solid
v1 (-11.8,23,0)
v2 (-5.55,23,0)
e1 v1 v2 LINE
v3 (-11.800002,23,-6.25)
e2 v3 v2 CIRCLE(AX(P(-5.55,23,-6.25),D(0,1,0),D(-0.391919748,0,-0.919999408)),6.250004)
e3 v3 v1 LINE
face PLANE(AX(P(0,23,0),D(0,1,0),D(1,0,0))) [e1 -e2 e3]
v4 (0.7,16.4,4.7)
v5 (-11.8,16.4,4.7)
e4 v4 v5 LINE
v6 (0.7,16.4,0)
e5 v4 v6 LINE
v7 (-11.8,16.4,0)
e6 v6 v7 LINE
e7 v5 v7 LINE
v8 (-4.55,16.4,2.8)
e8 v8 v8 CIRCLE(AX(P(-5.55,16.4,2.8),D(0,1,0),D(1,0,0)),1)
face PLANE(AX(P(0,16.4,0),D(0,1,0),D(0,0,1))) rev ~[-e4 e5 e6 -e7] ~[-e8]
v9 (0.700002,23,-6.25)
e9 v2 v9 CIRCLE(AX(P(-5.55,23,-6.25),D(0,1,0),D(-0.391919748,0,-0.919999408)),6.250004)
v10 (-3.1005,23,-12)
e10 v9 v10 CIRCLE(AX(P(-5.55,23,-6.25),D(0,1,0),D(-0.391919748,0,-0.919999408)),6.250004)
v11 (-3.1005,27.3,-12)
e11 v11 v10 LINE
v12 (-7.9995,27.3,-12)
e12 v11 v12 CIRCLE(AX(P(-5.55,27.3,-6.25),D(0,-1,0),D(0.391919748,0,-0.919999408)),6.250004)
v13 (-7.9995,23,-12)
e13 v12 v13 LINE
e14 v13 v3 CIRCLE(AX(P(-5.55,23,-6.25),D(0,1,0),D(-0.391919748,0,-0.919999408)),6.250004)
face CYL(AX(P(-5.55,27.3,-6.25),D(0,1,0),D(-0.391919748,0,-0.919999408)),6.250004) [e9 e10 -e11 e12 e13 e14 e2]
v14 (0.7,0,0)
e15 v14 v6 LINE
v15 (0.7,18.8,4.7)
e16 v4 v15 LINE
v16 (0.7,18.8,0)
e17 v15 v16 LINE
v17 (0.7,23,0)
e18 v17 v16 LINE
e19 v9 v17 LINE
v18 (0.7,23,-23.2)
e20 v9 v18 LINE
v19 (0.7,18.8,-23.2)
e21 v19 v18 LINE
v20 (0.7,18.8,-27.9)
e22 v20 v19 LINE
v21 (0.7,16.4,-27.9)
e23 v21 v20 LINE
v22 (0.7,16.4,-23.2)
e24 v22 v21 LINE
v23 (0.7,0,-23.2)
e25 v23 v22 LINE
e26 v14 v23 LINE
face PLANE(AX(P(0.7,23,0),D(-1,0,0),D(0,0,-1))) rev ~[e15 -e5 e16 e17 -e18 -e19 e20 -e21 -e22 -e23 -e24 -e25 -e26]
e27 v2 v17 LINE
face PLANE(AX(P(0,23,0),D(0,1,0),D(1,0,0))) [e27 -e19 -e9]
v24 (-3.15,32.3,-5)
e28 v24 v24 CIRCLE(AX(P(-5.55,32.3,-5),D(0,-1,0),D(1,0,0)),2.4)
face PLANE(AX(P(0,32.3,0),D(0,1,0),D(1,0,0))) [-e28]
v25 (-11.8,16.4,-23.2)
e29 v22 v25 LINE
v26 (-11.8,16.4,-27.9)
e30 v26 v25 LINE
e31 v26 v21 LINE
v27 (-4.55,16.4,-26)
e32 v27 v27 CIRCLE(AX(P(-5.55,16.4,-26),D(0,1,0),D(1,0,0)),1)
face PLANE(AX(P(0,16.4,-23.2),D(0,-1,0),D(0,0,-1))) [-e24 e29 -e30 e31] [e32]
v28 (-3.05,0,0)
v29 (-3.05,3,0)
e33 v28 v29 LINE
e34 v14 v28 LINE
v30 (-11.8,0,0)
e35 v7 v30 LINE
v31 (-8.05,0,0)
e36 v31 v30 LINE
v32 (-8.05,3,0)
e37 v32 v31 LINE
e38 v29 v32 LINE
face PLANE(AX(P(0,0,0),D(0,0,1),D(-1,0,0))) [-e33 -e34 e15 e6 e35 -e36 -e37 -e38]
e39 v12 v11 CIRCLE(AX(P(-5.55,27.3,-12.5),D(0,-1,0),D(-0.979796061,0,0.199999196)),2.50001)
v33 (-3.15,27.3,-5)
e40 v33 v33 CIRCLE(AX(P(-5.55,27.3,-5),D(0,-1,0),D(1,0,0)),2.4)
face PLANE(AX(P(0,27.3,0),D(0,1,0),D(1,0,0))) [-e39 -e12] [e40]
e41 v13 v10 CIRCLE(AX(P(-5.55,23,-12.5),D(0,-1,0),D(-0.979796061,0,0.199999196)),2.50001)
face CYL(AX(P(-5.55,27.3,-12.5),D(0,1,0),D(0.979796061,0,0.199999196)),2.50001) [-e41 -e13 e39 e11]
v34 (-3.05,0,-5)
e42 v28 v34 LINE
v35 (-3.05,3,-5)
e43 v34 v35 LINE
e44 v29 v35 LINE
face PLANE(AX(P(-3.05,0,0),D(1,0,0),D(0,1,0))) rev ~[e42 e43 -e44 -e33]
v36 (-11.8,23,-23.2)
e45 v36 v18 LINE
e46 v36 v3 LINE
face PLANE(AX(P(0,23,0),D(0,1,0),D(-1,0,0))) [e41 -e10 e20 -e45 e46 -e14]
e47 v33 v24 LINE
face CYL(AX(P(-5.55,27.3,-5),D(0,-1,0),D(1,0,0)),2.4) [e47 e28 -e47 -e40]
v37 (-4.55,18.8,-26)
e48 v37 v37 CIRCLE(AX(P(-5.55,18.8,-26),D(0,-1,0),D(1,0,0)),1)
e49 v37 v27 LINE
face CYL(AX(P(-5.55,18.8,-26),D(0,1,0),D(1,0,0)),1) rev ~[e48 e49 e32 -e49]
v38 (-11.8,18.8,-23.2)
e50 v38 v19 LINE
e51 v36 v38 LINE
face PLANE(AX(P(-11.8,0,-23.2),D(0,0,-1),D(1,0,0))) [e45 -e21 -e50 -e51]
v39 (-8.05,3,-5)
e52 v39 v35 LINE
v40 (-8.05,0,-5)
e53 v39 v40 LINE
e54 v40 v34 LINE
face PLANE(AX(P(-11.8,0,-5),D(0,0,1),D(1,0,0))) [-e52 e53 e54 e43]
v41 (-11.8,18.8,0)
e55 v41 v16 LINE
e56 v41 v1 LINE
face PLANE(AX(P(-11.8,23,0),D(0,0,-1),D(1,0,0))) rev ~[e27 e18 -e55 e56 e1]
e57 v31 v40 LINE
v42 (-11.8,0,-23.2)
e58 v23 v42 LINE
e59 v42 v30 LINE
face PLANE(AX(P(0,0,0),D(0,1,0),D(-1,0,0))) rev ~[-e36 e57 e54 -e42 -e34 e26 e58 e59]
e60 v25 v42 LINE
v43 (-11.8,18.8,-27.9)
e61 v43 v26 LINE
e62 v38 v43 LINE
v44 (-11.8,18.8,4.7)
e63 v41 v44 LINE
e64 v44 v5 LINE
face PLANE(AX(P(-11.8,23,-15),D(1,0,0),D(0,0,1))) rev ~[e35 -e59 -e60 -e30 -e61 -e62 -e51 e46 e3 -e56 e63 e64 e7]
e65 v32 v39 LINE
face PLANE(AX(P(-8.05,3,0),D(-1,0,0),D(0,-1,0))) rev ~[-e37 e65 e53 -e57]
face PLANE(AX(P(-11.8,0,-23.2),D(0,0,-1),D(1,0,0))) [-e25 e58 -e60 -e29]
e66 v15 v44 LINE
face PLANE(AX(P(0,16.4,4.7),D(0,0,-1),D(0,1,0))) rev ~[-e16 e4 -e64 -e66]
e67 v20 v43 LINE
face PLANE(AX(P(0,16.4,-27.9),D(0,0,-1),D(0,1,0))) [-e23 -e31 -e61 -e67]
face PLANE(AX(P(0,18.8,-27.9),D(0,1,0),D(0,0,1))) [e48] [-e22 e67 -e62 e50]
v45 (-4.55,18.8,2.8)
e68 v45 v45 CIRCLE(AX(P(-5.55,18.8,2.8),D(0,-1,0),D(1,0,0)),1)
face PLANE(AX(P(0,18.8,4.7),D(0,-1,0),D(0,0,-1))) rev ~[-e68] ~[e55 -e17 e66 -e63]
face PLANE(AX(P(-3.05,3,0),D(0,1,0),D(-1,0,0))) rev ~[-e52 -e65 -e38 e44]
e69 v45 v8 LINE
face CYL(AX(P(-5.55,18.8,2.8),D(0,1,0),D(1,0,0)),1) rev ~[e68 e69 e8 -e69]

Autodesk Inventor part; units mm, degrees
ref_plane "YZ Plane" through (0, 0, 0) normal (1, 0, 0) x (0, 1, 0)
ref_plane "XZ Plane" through (0, 0, 0) normal (0, 1, 0) x (-1, 0, 0)
ref_plane "XY Plane" through (0, 0, 0) normal (0, 0, 1) x (1, 0, 0)
sketch "Boceto1" plane through (0, 0, 0) normal (0, 1, 0) x (-1, 0, 0)
  line L0 (0, 0) -> (11.8, 0)
  line L1 (11.8, 0) -> (11.8, -23.2)
  line L2 (11.8, -23.2) -> (0, -23.2)
  line L3 (0, -23.2) -> (0, 0)
  dimension "d0" = 11.8
  dimension "d1" = 23.2
extrude "Extrusión1" add sketch "Boceto1" along normal blind 23
sketch "Boceto2" plane through (0, 0, 0) normal (1, 0, 0) x (0, 0, -1)
  line L0 (0, 0) -> (0, 23) projected
  line L1 (0, 0) -> (0, 16.4)
  line L2 (0, 16.4) -> (-4.7, 16.4)
  line L3 (-4.7, 16.4) -> (-4.7, 18.8)
  line L4 (-4.7, 18.8) -> (0, 18.8)
  line L5 (23.2, 0) -> (23.2, 23) projected
  line L6 (23.2, 16.4) -> (27.9, 16.4)
  line L7 (27.9, 16.4) -> (27.9, 18.8)
  line L8 (27.9, 18.8) -> (23.2, 18.8)
  line L9 (0, 18.8) -> (0, 16.4)
  line L10 (23.2, 18.8) -> (23.2, 16.4)
  dimension "d4" = 16.4
  dimension "d5" = 4.7
  dimension "d6" = 2.4
  dimension "d7" = 4.7
extrude "Extrusión2" add sketch "Boceto2" against normal blind 11.8
move faces "Desplazar1" translate (0.7, 0, 0) faces at (0, 5.4667, -15.4667)
sketch "Boceto4" plane through (-11.8, 18.8, 4.7) normal (0, 1, 0) x (1, 0, 0)
  line L0 (12.5, 0) -> (12.5, 4.7) projected
  line L1 (0, 0) -> (12.5, 0)
  line L2 (12.5, 0) -> (0, 0) projected
  line L3 (6.25, 0) -> (6.25, 1.9)
  line L4 (0, 32.6) -> (0, 27.9) projected
  line L5 (12.5, 32.6) -> (0, 32.6) projected
  line L6 (0, 32.6) -> (12.5, 32.6)
  line L7 (6.25, 32.6) -> (6.25, 30.7)
  circle A0 centre (6.25, 1.9) radius 1
  circle A1 centre (6.25, 30.7) radius 1
  point P0 (11.8, 4.7)
  dimension "d13" = 1.9
  dimension "d14" = 1.9
  dimension "d15" = 2
  dimension "d16" = 2
extrude "Extrusión3" cut sketch "Boceto4" against normal blind 2.4
sketch "Boceto5" plane through (0, 23, 0) normal (0, 1, 0) x (1, 0, 0)
  line L0 (-11.8, 23.2) -> (-11.8, 0) projected
  line L1 (-11.8, 0) -> (0.7, 0) projected
  line L2 (-11.8, 0) -> (0.7, 0)
  line L3 (0.7, 0) -> (0.7, 15)
  line L4 (0.7, 0) -> (0.7, 23.2) projected
  line L5 (0.7, 15) -> (-11.8, 15)
  line L6 (-11.8, 15) -> (-11.8, 0)
  point P0 (0, 0)
  dimension "d19" = 15
extrude "Extrusión4" add sketch "Boceto5" along normal blind 4.3
sketch "Boceto6" plane through (0, 27.3, 0) normal (0, 1, 0) x (1, 0, 0)
  line L0 (-11.8, 0) -> (0.7, 0) projected
  line L1 (-5.55, 0) -> (-5.55, 5)
  circle A0 centre (-5.55, 5) radius 2.4
  point P0 (0, 0)
  dimension "d22" = 5
  dimension "d23" = 4.8
extrude "Extrusión5" add sketch "Boceto6" along normal blind 5
sketch "Boceto7" plane through (0, 27.3, 0) normal (0, 1, 0) x (1, 0, 0)
  line L0 (-11.8, 0) -> (0.7, 0) projected
  line L1 (-5.55, 0) -> (-5.55, 6.25)
  arc A0 (-7.9995, 12) -> (-3.1005, 12) centre (-5.55, 6.25) ccw
  line L2 (0.7, 15) -> (-11.8, 15) projected
  arc A1 (-3.1005, 12) -> (-7.9995, 12) centre (-5.55, 12.5) ccw
  line L3 (0.7, 0) -> (-11.8, 0)
  line L4 (-11.8, 15) -> (-11.8, 0) projected
  line L5 (-11.8, 0) -> (-11.8, 15)
  line L6 (-11.8, 15) -> (0.7, 15)
  line L7 (0.7, 23.2) -> (0.7, 0) projected
  line L8 (0.7, 0) -> (0.7, 15)
  point P0 (0, 0)
  dimension "d26" = 6.25
extrude "Extrusión6" cut sketch "Boceto7" against normal blind 4.3 contours L4 A0 L0 | A0 L7 L0 | L4 L2 A1 A0 | A0 A1 L2 L7
sketch "Boceto9" plane through (-11.8, 0, 0) normal (0, 0, 1) x (1, 0, 0)
  line L0 (12.5, 0) -> (0, 0) projected
  line L1 (12.5, 0) -> (6.25, 0)
  line L2 (6.25, 0) -> (6.25, 3)
  line L3 (8.75, 3) -> (3.75, 3) projected
  line L4 (6.25, 3) -> (8.75, 3)
  line L5 (8.75, 0) -> (8.75, 3) projected
  line L6 (8.75, 3) -> (8.75, 0)
  line L7 (6.25, 3) -> (3.75, 3)
  line L8 (3.75, 3) -> (3.75, 0) projected
  line L9 (3.75, 3) -> (3.75, 0)
  line L10 (3.75, 0) -> (6.25, 0)
  point P0 (11.8, 0)
  dimension "d35" = 3
  dimension "d36" = 2.5
extrude "Extrusión8" cut sketch "Boceto9" against normal blind 5
properties part number "microservo_FT"
